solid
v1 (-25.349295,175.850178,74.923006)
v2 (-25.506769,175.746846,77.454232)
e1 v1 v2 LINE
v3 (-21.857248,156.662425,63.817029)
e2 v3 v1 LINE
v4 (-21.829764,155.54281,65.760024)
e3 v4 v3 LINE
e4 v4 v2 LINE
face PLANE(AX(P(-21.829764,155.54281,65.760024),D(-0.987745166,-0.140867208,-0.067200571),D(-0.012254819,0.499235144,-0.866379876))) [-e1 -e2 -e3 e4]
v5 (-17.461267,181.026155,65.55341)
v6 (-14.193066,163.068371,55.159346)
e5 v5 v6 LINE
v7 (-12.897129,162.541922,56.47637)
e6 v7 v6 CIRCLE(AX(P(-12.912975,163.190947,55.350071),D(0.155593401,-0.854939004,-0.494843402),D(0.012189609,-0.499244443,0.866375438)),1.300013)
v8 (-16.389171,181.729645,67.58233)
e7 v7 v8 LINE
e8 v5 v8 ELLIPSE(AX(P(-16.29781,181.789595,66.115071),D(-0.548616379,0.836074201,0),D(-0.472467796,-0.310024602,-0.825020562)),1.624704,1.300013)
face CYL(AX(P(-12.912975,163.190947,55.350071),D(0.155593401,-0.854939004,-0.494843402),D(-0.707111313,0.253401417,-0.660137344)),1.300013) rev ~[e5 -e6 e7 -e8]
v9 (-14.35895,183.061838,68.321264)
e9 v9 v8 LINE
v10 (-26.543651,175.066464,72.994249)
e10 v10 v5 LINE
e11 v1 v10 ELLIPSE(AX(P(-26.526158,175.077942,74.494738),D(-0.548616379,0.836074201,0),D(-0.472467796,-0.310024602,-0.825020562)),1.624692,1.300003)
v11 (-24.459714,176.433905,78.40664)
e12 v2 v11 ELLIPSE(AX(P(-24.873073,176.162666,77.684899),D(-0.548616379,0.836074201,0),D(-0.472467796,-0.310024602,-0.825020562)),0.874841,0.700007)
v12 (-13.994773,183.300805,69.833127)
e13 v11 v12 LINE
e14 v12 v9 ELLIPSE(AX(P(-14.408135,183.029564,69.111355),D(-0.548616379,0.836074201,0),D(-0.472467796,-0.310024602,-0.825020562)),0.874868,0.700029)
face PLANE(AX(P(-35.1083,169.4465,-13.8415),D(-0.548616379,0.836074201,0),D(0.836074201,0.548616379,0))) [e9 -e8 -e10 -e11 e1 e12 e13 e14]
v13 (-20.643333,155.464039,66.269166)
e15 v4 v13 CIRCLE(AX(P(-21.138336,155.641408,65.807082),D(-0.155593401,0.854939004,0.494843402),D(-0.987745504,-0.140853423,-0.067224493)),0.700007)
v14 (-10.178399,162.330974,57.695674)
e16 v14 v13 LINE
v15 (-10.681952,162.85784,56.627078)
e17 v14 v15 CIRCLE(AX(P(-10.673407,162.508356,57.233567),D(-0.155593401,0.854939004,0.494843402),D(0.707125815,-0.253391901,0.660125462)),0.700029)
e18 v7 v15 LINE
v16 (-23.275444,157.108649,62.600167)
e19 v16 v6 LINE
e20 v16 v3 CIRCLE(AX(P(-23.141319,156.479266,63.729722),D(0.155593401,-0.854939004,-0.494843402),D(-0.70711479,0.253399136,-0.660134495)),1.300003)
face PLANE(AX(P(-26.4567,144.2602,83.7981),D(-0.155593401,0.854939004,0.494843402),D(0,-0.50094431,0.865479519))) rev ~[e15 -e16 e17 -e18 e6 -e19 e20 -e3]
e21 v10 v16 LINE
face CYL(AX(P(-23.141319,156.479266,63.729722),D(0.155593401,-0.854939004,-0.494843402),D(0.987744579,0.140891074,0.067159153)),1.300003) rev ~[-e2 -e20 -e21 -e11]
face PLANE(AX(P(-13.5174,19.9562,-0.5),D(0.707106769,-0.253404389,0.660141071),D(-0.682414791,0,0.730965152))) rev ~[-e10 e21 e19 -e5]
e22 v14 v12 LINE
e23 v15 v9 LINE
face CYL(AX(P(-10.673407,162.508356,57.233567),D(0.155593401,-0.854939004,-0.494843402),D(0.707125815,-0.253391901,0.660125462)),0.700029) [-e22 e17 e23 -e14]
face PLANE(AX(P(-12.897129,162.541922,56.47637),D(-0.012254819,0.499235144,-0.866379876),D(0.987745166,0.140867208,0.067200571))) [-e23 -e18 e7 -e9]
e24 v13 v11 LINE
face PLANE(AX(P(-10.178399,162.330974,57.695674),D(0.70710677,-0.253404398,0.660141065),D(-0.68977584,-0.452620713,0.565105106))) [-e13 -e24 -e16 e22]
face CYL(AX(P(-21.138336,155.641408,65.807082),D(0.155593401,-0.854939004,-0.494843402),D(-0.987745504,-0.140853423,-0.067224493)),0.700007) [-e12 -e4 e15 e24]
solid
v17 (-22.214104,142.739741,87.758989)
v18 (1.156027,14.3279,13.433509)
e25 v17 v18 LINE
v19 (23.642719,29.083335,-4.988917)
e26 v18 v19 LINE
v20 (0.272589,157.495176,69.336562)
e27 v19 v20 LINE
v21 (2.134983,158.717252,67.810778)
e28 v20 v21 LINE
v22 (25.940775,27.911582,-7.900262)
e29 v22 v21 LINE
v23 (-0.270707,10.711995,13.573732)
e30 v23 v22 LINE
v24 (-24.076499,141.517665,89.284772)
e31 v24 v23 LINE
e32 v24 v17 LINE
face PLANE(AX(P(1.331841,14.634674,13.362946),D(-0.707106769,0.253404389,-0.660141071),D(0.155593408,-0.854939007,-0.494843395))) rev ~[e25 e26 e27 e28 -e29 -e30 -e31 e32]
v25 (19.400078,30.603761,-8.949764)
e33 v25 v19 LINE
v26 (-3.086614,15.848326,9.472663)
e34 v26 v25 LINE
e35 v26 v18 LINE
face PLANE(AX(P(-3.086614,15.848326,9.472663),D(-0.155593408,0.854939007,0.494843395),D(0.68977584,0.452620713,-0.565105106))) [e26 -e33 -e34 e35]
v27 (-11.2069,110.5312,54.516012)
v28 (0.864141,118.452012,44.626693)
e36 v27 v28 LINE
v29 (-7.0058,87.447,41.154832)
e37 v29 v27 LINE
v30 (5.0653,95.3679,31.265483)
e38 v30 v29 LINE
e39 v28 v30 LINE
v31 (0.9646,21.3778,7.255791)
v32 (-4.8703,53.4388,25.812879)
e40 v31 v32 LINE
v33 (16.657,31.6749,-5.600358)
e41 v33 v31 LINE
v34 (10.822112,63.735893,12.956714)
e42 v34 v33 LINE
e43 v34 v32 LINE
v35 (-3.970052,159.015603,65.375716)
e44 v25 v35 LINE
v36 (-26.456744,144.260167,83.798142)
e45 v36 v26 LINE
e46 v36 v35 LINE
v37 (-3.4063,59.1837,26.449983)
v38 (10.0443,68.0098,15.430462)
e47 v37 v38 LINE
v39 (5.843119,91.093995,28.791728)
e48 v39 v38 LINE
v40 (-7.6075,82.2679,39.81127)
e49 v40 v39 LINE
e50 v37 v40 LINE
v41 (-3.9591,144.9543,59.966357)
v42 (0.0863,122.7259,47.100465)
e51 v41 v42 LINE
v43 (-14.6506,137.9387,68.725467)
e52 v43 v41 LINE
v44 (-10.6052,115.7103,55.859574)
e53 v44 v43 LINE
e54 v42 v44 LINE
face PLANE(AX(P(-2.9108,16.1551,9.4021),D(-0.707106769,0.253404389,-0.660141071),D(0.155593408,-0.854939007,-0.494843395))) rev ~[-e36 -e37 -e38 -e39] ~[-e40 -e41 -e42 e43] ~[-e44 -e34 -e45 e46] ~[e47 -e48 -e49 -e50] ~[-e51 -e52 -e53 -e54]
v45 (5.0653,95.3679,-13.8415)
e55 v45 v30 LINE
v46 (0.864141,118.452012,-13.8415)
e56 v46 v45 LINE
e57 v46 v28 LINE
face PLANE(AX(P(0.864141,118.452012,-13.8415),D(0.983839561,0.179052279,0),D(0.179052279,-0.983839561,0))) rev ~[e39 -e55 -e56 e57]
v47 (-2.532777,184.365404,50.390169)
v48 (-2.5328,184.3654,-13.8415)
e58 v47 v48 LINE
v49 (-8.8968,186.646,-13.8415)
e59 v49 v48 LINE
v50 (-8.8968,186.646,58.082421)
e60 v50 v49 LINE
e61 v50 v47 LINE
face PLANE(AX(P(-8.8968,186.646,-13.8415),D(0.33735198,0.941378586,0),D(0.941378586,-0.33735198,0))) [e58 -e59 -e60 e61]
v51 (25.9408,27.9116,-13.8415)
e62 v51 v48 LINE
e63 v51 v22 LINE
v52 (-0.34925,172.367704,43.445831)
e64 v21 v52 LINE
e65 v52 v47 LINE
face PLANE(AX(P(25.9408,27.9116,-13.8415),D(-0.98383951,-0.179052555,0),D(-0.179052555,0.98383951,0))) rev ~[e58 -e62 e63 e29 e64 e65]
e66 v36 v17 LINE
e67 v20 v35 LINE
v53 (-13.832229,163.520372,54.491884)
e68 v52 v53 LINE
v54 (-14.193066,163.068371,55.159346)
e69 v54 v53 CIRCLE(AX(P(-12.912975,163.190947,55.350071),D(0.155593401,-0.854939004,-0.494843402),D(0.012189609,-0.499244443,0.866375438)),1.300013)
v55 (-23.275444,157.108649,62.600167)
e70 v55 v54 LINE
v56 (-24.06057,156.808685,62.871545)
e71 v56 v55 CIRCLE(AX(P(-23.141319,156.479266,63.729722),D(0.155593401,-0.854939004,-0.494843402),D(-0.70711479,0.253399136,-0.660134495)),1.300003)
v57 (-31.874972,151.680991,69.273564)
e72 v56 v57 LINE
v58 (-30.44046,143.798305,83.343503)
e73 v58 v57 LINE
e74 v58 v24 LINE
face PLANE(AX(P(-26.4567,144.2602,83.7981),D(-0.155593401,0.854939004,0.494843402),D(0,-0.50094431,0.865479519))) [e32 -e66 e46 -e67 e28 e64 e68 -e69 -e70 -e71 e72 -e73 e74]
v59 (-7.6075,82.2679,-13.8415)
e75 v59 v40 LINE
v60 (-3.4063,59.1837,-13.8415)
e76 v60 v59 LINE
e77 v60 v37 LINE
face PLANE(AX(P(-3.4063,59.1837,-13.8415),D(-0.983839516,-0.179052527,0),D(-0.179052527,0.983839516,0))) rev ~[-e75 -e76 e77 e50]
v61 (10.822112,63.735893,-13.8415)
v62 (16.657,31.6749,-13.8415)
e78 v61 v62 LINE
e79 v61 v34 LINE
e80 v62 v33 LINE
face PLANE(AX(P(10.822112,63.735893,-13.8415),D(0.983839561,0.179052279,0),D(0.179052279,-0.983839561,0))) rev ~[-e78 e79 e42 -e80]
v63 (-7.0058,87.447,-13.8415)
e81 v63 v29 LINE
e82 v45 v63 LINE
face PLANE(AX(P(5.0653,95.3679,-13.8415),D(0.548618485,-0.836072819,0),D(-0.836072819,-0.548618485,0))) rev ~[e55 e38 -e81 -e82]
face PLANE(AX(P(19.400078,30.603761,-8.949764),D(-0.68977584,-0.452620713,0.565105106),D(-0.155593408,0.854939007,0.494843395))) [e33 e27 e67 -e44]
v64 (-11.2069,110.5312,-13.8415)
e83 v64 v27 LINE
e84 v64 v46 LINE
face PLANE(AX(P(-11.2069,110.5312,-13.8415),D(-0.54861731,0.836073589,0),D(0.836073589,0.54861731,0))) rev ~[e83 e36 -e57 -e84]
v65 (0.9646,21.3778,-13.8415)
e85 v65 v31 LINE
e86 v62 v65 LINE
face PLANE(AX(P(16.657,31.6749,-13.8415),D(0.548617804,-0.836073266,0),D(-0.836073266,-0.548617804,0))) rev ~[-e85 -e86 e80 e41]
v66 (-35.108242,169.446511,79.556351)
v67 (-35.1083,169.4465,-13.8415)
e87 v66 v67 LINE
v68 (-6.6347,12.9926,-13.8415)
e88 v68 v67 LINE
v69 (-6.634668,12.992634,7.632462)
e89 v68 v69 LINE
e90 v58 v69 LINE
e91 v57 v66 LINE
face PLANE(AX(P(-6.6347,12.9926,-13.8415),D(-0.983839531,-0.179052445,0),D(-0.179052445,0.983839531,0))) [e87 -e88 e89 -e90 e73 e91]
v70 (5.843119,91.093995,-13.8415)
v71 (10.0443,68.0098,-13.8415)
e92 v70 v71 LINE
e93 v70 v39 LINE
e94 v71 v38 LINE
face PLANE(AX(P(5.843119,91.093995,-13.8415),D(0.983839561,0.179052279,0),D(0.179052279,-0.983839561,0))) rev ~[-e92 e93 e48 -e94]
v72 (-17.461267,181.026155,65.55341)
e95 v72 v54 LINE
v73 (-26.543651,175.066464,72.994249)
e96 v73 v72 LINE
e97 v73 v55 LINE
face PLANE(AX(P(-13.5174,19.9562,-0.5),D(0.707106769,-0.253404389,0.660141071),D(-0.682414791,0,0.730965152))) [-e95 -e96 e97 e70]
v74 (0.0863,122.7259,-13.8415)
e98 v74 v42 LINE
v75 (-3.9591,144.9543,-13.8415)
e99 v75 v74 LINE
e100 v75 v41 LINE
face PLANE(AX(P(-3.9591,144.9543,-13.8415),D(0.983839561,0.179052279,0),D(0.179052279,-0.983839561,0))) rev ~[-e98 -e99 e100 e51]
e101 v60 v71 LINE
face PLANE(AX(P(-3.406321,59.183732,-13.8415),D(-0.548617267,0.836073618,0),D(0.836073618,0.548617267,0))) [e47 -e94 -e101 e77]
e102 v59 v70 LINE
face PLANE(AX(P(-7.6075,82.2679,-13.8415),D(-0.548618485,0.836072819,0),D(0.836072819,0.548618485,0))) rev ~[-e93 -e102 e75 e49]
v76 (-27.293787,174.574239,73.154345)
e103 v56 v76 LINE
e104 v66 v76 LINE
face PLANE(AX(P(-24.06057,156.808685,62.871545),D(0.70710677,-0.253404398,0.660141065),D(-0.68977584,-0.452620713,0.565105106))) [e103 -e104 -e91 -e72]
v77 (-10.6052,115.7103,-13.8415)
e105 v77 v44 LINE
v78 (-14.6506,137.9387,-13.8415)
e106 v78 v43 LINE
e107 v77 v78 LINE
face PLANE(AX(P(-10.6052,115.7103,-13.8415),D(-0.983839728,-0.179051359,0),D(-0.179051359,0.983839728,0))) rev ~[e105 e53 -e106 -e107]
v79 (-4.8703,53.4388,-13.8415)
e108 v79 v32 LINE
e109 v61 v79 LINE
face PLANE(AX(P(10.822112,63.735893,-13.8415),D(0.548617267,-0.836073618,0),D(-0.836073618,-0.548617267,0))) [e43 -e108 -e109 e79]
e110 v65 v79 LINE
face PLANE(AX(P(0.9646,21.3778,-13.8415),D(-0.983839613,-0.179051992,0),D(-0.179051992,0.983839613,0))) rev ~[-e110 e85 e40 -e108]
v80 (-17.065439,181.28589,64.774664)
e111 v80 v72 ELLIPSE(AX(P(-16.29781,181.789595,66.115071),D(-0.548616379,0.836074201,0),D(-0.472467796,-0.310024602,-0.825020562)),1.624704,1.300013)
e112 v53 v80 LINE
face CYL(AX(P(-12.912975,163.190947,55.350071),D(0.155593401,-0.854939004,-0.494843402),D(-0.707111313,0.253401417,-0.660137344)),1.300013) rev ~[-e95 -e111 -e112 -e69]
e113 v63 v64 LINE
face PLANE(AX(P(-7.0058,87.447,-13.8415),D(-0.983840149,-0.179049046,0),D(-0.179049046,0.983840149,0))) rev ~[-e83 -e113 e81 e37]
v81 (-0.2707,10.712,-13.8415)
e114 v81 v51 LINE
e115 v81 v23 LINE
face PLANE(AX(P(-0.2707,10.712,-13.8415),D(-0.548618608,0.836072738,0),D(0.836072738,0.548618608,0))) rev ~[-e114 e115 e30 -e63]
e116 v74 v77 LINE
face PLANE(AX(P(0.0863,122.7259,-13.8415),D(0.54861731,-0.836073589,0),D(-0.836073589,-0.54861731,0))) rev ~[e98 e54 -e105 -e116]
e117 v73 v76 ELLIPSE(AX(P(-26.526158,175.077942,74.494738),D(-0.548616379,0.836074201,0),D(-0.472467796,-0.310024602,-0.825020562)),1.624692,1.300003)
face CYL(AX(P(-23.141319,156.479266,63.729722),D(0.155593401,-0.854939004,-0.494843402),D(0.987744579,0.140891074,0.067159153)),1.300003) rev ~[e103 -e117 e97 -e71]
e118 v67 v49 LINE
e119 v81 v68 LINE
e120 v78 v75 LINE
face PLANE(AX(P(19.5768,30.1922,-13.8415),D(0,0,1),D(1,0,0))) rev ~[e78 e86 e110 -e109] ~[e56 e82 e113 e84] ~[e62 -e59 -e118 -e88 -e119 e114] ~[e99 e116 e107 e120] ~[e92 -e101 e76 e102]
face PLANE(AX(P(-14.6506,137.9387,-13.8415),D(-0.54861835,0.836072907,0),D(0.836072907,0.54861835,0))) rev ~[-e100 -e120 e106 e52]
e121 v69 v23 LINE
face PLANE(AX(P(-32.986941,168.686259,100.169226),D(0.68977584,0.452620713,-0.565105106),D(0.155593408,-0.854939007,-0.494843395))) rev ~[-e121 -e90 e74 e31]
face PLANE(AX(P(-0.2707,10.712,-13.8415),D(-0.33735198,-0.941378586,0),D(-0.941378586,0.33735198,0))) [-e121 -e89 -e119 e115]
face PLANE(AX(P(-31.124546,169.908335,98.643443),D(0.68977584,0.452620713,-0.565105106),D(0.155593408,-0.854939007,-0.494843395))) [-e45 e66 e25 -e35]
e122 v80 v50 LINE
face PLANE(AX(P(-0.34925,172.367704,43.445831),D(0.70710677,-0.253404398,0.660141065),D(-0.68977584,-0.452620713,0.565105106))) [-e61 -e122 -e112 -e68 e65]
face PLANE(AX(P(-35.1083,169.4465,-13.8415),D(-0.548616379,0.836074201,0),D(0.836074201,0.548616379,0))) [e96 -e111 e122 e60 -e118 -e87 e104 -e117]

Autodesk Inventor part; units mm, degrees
sketch3d "3D Sketch1"
ref_plane "Work Plane1" through (-0.0056, 14.7303, 11.9873) normal (-1, 0, 0) x (0, 0, -1)
ref_plane "Work Plane2" through (-2.9108, 16.1551, 9.4021) normal (-0.7071068, 0.2534044, -0.6601411) x (0.1555934, -0.854939, -0.4948434)
sketch "Sketch2" plane through (-2.9108, 16.1551, 9.4021) normal (-0.7071068, 0.2534044, -0.6601411) x (0.1555934, -0.854939, -0.4948434)
  line L0 (-180, 0) -> (0, 0)
  line L1 (0, 0) -> (0, -32)
  line L2 (0, -32) -> (-180, -32)
  line L3 (-180, -32) -> (-180, 0)
  line L4 (3, -35) -> (-180, -35)
  line L5 (-180, -35) -> (-180, 3)
  line L6 (-180, 3) -> (3, 3)
  line L7 (3, 3) -> (3, -35)
  line L8 (-180, 0.3) -> (0.2, 0.3)
  line L9 (0.2, 0.3) -> (0.2, -32.3)
  line L10 (0.2, -32.3) -> (-180, -32.3)
  line L11 (-180, -32.3) -> (-180, 0.3)
  point P0 (-180, 0)
  dimension "d1" = 180
  dimension "d2" = 32
  dimension "d5" = 3
  dimension "d6" = 3
  dimension "d7" = 3
  dimension "d13" = 0.2
  dimension "d14" = 0.3
  dimension "d15" = 0.3
extrude "Extrusion1" add sketch "Sketch2" along normal blind 3
extrude "Extrusion3" add sketch "Sketch2" against normal blind 6 contours L5 L6 L7 L4 L10 L9 L8
ref_plane "Work Plane3" through (19.5768, 30.1922, -13.8415) normal (0, 0, 1) x (1, 0, 0)
sketch "Sketch4" plane through (-3.0866, 15.8483, 9.4727) normal (-0.1555934, 0.854939, 0.4948434) x (0.7071068, -0.2534044, 0.6601411)
  line L0 (0, 0) -> (0, 32.6) projected
  line L1 (0, 0) -> (6, 0) projected
  line L2 (6, 32.6) -> (6, 0) projected
  line L3 (0, 32.6) -> (6, 32.6) projected
  line L4 (5, 32.6) -> (6, 32.0226)
  point P0 (-0.0547, 0.3088)
  dimension "d18" = 5
  dimension "d20" = 30
extrude "Extrusion4" [suppressed]
sketch "Sketch5" plane through (19.5768, 30.1922, -13.8415) normal (0, 0, 1) x (1, 0, 0)
  line L0 (-26.2115, -17.1996) -> (-54.6851, 139.2543) projected
  line L1 (-19.8475, -19.4802) -> (-26.2115, -17.1996) projected
  line L2 (-19.8475, -19.4802) -> (6.364, -2.2806) projected
  line L3 (6.364, -2.2806) -> (-22.1096, 154.1732) projected
  line L4 (-54.6851, 139.2543) -> (-28.4736, 156.4538) projected
  line L5 (-28.4736, 156.4538) -> (-22.1096, 154.1732) projected
  point P0 (-19.5768, -30.1922)
extrude "Extrusion5" add sketch "Sketch5" along normal up to next
sketch "Sketch6" plane through (-2.9108, 16.1551, 9.4021) normal (0.7071068, -0.2534044, 0.6601411) x (0.6897758, 0.4526207, -0.5651051)
  line L0 (13.5, 135.3) -> (29, 135.3)
  line L1 (13.5, 109.3) -> (13.5, 135.3)
  line L2 (11.5, 109.3) -> (13.5, 109.3)
  line L3 (11.5, 77.3) -> (11.5, 109.3)
  line L4 (9.5, 77.3) -> (11.5, 77.3)
  line L5 (9.5, 45.3) -> (9.5, 77.3)
  line L6 (6.25, 45.3) -> (9.5, 45.3)
  line L7 (6.25, 2.8) -> (6.25, 45.3)
  line L8 (29, 2.8) -> (6.25, 2.8)
  line L9 (29, 135.3) -> (29, 2.8)
  line L10 (32, 0) -> (32, 180) projected
  line L11 (0, 0) -> (32, 0) projected
  line L12 (32.3, 180) -> (32.3, -0.2) projected
  line L13 (32.3, -0.2) -> (29, -0.2)
  line L14 (29, -0.2) -> (29, 2.8)
  line L15 (29, 2.8) -> (32.3, 2.8)
  line L16 (32.3, 2.8) -> (32.3, -0.2)
  point P0 (0.0088, -18.9171)
  dimension "d25" = 3
  dimension "d26" = 3.3
sketch "Sketch8" plane through (19.5768, 30.1922, -13.8415) normal (0, 0, -1) x (-1, 0, 0)
  line L0 (0.1767, 0.4115) -> (28.2147, 154.4716) projected
  line L1 (50.7014, 139.7161) -> (28.2147, 154.4716) projected
  line L2 (50.7014, 139.7161) -> (22.6634, -14.3439) projected
  line L3 (22.6634, -14.3439) -> (0.1767, 0.4115) projected
  line L4 (18.6122, -8.8144) -> (25.2249, 27.5205) projected
  line L5 (2.9198, 1.4827) -> (18.6122, -8.8144) projected
  line L6 (23.5359, 114.7621) -> (2.9198, 1.4827) projected
  line L7 (25.2249, 27.5205) -> (22.9831, 28.9915) projected
  line L8 (22.9831, 28.9915) -> (27.9621, 56.3496) projected
  line L9 (26.5826, 57.2548) -> (31.5615, 84.6129) projected
  line L10 (27.9621, 56.3496) -> (26.5826, 57.2548) projected
  line L11 (30.182, 85.5181) -> (34.2274, 107.7465) projected
  line L12 (31.5615, 84.6129) -> (30.182, 85.5181) projected
  line L13 (34.2274, 107.7465) -> (23.5359, 114.7621) projected
  line L14 (26.6416, 26.5909) -> (9.5325, 37.8176)
  line L15 (9.5325, 37.8176) -> (7.338, 34.4733)
  line L16 (7.338, 34.4733) -> (24.4471, 23.2466)
  line L17 (24.4471, 23.2466) -> (26.6416, 26.5909)
  line L18 (29.3788, 55.42) -> (27.1843, 52.0757)
  line L19 (27.1843, 52.0757) -> (12.317, 61.8314)
  line L20 (12.317, 61.8314) -> (14.5115, 65.1757)
  line L21 (14.5115, 65.1757) -> (29.3788, 55.42)
  line L22 (32.9782, 83.6833) -> (30.7837, 80.339)
  line L23 (30.7837, 80.339) -> (17.296, 89.1894)
  line L24 (17.296, 89.1894) -> (19.4905, 92.5337)
  line L25 (19.4905, 92.5337) -> (32.9782, 83.6833)
  point P0 (19.5768, -30.1922)
  point P1 (18.7127, 88.2598)
  point P2 (13.7337, 60.9018)
  point P3 (8.7547, 33.5437)
  dimension "d27" = 4
  dimension "d28" = 4
  dimension "d29" = 4
extrude "Extrusion6" cut sketch "Sketch8" against normal through all contours L5 L6 L16 L4 | L14 L6 L19 L8 | L6 L23 L9 L21 | L6 L13 L11 L25
ref_plane "Work Plane4" through (-13.5174, 19.9562, -0.5) normal (0.7071068, -0.2534044, 0.6601411) x (0.6897758, 0.4526207, -0.5651051)
ref_plane "Work Plane6" through (-26.4567, 144.2602, 83.7981) normal (-0.1555934, 0.854939, 0.4948434) x (0.7071068, -0.2534044, 0.6601411)
split body "Split1" result two bodies by plane through (-26.4567, 144.2602, 83.7981) normal (-0.1555934, 0.854939, 0.4948434) first body at (-13.9482, 171.37, 41.9041)
split body "Split2" result two bodies by plane through (-13.5174, 19.9562, -0.5) normal (0.7071068, -0.2534044, 0.6601411) bodies 2 first body at (-22.4266, 166.4041, 87.2241)
sketch "Sketch9" plane through (-26.4567, 144.2602, 83.7981) normal (-0.1555934, 0.854939, 0.4948434) x (0.7071068, -0.2534044, 0.6601411)
  line L0 (-15, 7.5724) -> (-15, 45.5724) projected
  line L1 (-13.2929, 19.8653) -> (-11.7071, 18.2796)
  line L2 (-10, 18.9867) -> (-10, 34.1582)
  line L3 (-11.7071, 34.8653) -> (-13.2929, 33.2796)
  arc A0 (-11.7071, 18.2796) -> (-10, 18.9867) centre (-11, 18.9867) ccw
  arc A1 (-10, 34.1582) -> (-11.7071, 34.8653) centre (-11, 34.1582) ccw
  line L4 (-15, 7.5724) -> (-15, 45.5724) projected
  line L5 (-15, 7.5724) -> (-3, -2.7) projected
  line L6 (-3, -2.7) -> (-3, 35.3) projected
  line L7 (-15, 45.5724) -> (-3, 35.3) projected
  line L8 (-15, 45.5724) -> (-15, 53.2768) projected
  line L9 (-15, 45.5724) -> (-3, 35.3) projected
  line L10 (-3, 35.3) -> (6, 35.3) projected
  line L11 (-15, 53.2768) -> (6, 35.3) projected
  line L12 (0, 0) -> (0, 32.6) projected
  line L13 (0, 32.6) -> (6, 32.6) projected
  line L14 (6, 35.3) -> (6, 32.6) projected
  line L15 (-3, 35.3) -> (6, 35.3) projected
  line L16 (-3, -2.7) -> (-3, 35.3) projected
  line L17 (6, -2.7) -> (-3, -2.7) projected
  line L18 (6, 0) -> (6, -2.7) projected
  line L19 (0, 0) -> (6, 0) projected
  line L20 (-15, 45.5724) -> (-15, 53.2768) projected
  line L21 (-34.0212, 69.5596) -> (-15, 53.2768) projected
  line L22 (-15, 33.9867) -> (-15, 53.2768)
  line L23 (-15, 19.1582) -> (-15, 7.5724)
  arc A2 (-13.2929, 19.8653) -> (-15, 19.1582) centre (-14, 19.1582) ccw
  arc A3 (-15, 33.9867) -> (-13.2929, 33.2796) centre (-14, 33.9867) ccw
  line L24 (-15.3, 53.5336) -> (-15.3, 33.9867)
  arc A4 (-15.3, 33.9867) -> (-13.0808, 33.0674) centre (-14, 33.9867) ccw
  line L25 (-13.0808, 33.0674) -> (-11.495, 34.6532)
  arc A5 (-10.3, 34.1582) -> (-11.495, 34.6532) centre (-11, 34.1582) ccw
  line L26 (-10.3, 34.1582) -> (-10.3, 18.9867)
  arc A6 (-11.495, 18.4917) -> (-10.3, 18.9867) centre (-11, 18.9867) ccw
  line L27 (-11.495, 18.4917) -> (-13.0808, 20.0775)
  arc A7 (-13.0808, 20.0775) -> (-15.3, 19.1582) centre (-14, 19.1582) ccw
  line L28 (-15.3, 19.1582) -> (-15.3, 7.8293)
  line L29 (-43.0212, 31.5596) -> (-15, 7.5724) projected
  point P0 (-0.0547, 0.3088)
  point P1 (-15, 21.5724)
  point P2 (-10, 16.5724)
  point P3 (-10, 36.5724)
  point P4 (-15, 31.5724)
  point P5 (-15, 33.9867)
  point P6 (-15, 45.5724)
  point P7 (-15, 33.156)
  point P8 (-15, 19.9889)
  dimension "d35" = 45
  dimension "d36" = 45
  dimension "d37" = 20
  dimension "d38" = 5
  dimension "d40" = 10
  dimension "d41" = 38
  dimension "d42" = 14
  dimension "d47" = 1
  dimension "d48" = 1
  dimension "d49" = 0.3
extrude "Extrusion7" cut sketch "Sketch9" along normal through all contours L29 L28 A7 L0 | L0 A7 L27 A6 L26 A5 L25 A4 A3 L3 A1 L2 A0 L1 A2 | A4 L24 L21 L8 L0 bodies 4 5
sketch "Sketch11" plane through (-26.4567, 144.2602, 83.7981) normal (-0.1555934, 0.854939, 0.4948434) x (0.7071068, -0.2534044, 0.6601411)
  line L0 (34.4958, 0.0029) -> (24.2403, 8.7821)
  line L1 (24.2403, 8.7821) -> (25.6343, 10.4105)
  line L2 (25.6343, 10.4105) -> (35.8898, 1.6314)
  line L3 (35.8898, 1.6314) -> (34.4958, 0.0029)
  line L4 (32.5449, -2.2761) -> (29.886, 0)
  line L5 (29.886, 0) -> (27.5747, -2.7)
  line L6 (27.5747, -2.7) -> (30.2336, -4.9761)
  line L7 (30.2336, -4.9761) -> (32.5449, -2.2761)
  line L8 (34.4958, 0.0029) -> (32.5449, -2.2761)
  line L9 (-11.495, 18.4917) -> (-13.0808, 20.0775) projected
  arc A0 (-15, 19.9889) -> (-15.3, 19.1582) centre (-14, 19.1582) ccw projected
  line L10 (-15, 33.156) -> (-15, 19.9889) projected
  arc A1 (-15.3, 33.9867) -> (-15, 33.156) centre (-14, 33.9867) ccw projected
  line L11 (-13.0808, 33.0674) -> (-11.495, 34.6532) projected
  arc A2 (-10.3, 34.1582) -> (-11.495, 34.6532) centre (-11, 34.1582) ccw projected
  line L12 (-10.3, 34.1582) -> (-10.3, 18.9867) projected
  arc A3 (-11.495, 18.4917) -> (-10.3, 18.9867) centre (-11, 18.9867) ccw projected
  line L13 (6, -2.7) -> (-3, -2.7) projected
  line L14 (-3, -2.7) -> (-43.0212, 31.5596) projected
  line L15 (-15, 7.5724) -> (-15, 19.1582) projected
  arc A4 (-13.2929, 19.8653) -> (-15, 19.1582) centre (-14, 19.1582) ccw projected
  line L16 (-13.2929, 19.8653) -> (-11.7071, 18.2796) projected
  arc A5 (-11.7071, 18.2796) -> (-10, 18.9867) centre (-11, 18.9867) ccw projected
  line L17 (-10, 18.9867) -> (-10, 34.1582) projected
  arc A6 (-10, 34.1582) -> (-11.7071, 34.8653) centre (-11, 34.1582) ccw projected
  line L18 (-11.7071, 34.8653) -> (-13.2929, 33.2796) projected
  arc A7 (-15, 33.9867) -> (-13.2929, 33.2796) centre (-14, 33.9867) ccw projected
  line L19 (-15, 33.9867) -> (-15, 53.2768) projected
  line L20 (-34.0212, 69.5596) -> (6, 35.3) projected
  line L21 (6, 35.3) -> (6, 32.6) projected
  line L22 (6, 32.6) -> (0, 32.6) projected
  line L23 (0, 32.6) -> (0, 0) projected
  line L24 (0, 0) -> (6, 0) projected
  line L25 (6, 0) -> (6, -2.7) projected
  line L26 (-15.3, 19.1582) -> (-15.3, 7.8293) projected
  line L27 (-15.3, 53.5336) -> (-15.3, 33.9867) projected
  line L28 (-3, 35.3) -> (6, 35.3) projected
  line L29 (0, 32.6) -> (6, 32.6) projected
  line L30 (0, 0) -> (0, 32.6) projected
  line L31 (-3, -2.7) -> (-3, 35.3) projected
  line L32 (6, 35.3) -> (6, 32.6) projected
  line L33 (6, -2.7) -> (-3, -2.7) projected
  line L34 (6, 0) -> (6, -2.7) projected
  line L35 (0, 0) -> (6, 0) projected
  line L36 (6, 35.3) -> (6, 32.6) projected
  line L37 (-15.3, 53.5336) -> (6, 35.3) projected
  line L38 (-15, 53.2768) -> (6, 35.3) projected
  line L39 (24.2403, 8.7821) -> (25.905, 10.057)
  line L40 (25.905, 10.057) -> (7.6648, 33.8749)
  line L41 (7.6648, 33.8749) -> (6, 32.6)
  line L42 (6, 32.6) -> (24.2403, 8.7821)
  line L43 (6, 35.3) -> (7.6648, 33.8749)
  line L44 (6, -2.7) -> (27.5747, -2.7)
  line L45 (6, 0) -> (29.886, 0)
  line L46 (24.2403, 8.7821) -> (6, 24.3964) construction
  line L47 (6, 32.6) -> (6, 0) construction
  line L48 (6, 35.3) -> (6, 32.6)
  line L49 (6, 0) -> (6, -2.7) projected
  line L50 (6, 0) -> (6, -2.7)
  line L51 (6, 35.3) -> (6, 32.6) projected
  arc A8 (-13.0808, 20.0775) -> (-15, 19.9889) centre (-14, 19.1582) ccw projected
  arc A9 (-15, 33.156) -> (-13.0808, 33.0674) centre (-14, 33.9867) ccw projected
  line L52 (-15.3, 7.8293) -> (-43.0212, 31.5596) projected
  line L53 (-34.0212, 69.5596) -> (-15.3, 53.5336) projected
  line L54 (-43.0212, 31.5596) -> (-43.0212, 69.5596) projected
  line L55 (-43.0212, 69.5596) -> (-34.0212, 69.5596) projected
  point P0 (-0.0547, 0.3088)
  dimension "d63" = 3
  dimension "d64" = 3.5
  dimension "d65" = 13.5
  dimension "d66" = 30
  dimension "d67" = 24.0107
extrude "Extrusion8" add sketch "Sketch11" along normal up to surface (30 mm away) contours L0 L39 L40 L2 L3 | L42 L41 L40 L1 | L1 L40 L39 | L7 L6 L5 L4 | L21 L43 L41 | L5 L44 L25 L45 bodies 4
sketch "Sketch12" plane through (-3.97, 159.0156, 65.3757) normal (0.1555934, -0.854939, -0.4948434) x (0.7071068, -0.2534044, 0.6601411)
  arc A0 (-15, 13.4418) -> (-13.2929, 12.7347) centre (-14, 13.4418) ccw projected
  line L0 (-13.2929, 12.7347) -> (-11.7071, 14.3204) projected
  arc A1 (-10, 13.6133) -> (-11.7071, 14.3204) centre (-11, 13.6133) ccw projected
  line L1 (-10, 13.6133) -> (-10, -1.5582) projected
  arc A2 (-11.7071, -2.2653) -> (-10, -1.5582) centre (-11, -1.5582) ccw projected
  line L2 (-11.7071, -2.2653) -> (-13.2929, -0.6796) projected
  arc A3 (-13.2929, -0.6796) -> (-15, -1.3867) centre (-14, -1.3867) ccw projected
  line L3 (-15, -20.6768) -> (-15, -1.3867) projected
  line L4 (-15, -20.6768) -> (7.6648, -1.2749) projected
  line L5 (25.6343, 22.1895) -> (7.6648, -1.2749) projected
  line L6 (35.8898, 30.9686) -> (25.6343, 22.1895) projected
  line L7 (34.4958, 32.5971) -> (35.8898, 30.9686) projected
  line L8 (24.2403, 23.8179) -> (34.4958, 32.5971) projected
  line L9 (6, 0) -> (24.2403, 23.8179) projected
  line L10 (6, 0) -> (0, 0) projected
  line L11 (0, 0) -> (0, 32.6) projected
  line L12 (0, 32.6) -> (29.886, 32.6) projected
  line L13 (32.5449, 34.8761) -> (29.886, 32.6) projected
  line L14 (30.2336, 37.5761) -> (32.5449, 34.8761) projected
  line L15 (27.5747, 35.3) -> (30.2336, 37.5761) projected
  line L16 (27.5747, 35.3) -> (-3, 35.3) projected
  line L17 (-3, 35.3) -> (-15, 25.0276) projected
  line L18 (-15, 13.4418) -> (-15, 25.0276) projected
  line L19 (30.2336, 37.5761) -> (35.8898, 30.9686)
  line L20 (6, 0) -> (6, 32.6)
  point P0 (-0.0547, 32.2912)
  point P1 (34.4958, 32.5971)
  point P2 (32.5449, 34.8761)
  point P3 (34.4958, 32.5971)
  point P4 (32.5449, 34.8761)
extrude "Extrusion9" add sketch "Sketch12" against normal blind 3 contours L19 L8 L9 L20 L12 L13 bodies 4
combine bodies "Combine2" operation type add bodies to combine 5 3
fillet "Fillet1" radius 1.5 7 edges at (-7.3283, 164.4545, 115.5483) (-9.8368, 161.4831, 119.8932) (-20.5582, 166.1217, 108.508) (-7.8914, 150.7934, 111.6921) (-5.8259, 156.199, 103.0022) (-6.1608, 175.442, 96.9323) (-11.4375, 152.6823, 80.0323)
delete faces "Delete Face1" heal no whole lump yes faces at (-7.5891, 154.4464, 77.9282)
equation "\"d15\" = d14"
equation "\"d28\" = d27"
equation "\"d29\" = d28"
equation "\"d42\" = -0.5 * d40 + 0.5 * d41"
equation "\"d49\" = doveTailTolerance"
equation "\"doveTailTolerance\" = 0.3"
properties part number "sledHolder"
